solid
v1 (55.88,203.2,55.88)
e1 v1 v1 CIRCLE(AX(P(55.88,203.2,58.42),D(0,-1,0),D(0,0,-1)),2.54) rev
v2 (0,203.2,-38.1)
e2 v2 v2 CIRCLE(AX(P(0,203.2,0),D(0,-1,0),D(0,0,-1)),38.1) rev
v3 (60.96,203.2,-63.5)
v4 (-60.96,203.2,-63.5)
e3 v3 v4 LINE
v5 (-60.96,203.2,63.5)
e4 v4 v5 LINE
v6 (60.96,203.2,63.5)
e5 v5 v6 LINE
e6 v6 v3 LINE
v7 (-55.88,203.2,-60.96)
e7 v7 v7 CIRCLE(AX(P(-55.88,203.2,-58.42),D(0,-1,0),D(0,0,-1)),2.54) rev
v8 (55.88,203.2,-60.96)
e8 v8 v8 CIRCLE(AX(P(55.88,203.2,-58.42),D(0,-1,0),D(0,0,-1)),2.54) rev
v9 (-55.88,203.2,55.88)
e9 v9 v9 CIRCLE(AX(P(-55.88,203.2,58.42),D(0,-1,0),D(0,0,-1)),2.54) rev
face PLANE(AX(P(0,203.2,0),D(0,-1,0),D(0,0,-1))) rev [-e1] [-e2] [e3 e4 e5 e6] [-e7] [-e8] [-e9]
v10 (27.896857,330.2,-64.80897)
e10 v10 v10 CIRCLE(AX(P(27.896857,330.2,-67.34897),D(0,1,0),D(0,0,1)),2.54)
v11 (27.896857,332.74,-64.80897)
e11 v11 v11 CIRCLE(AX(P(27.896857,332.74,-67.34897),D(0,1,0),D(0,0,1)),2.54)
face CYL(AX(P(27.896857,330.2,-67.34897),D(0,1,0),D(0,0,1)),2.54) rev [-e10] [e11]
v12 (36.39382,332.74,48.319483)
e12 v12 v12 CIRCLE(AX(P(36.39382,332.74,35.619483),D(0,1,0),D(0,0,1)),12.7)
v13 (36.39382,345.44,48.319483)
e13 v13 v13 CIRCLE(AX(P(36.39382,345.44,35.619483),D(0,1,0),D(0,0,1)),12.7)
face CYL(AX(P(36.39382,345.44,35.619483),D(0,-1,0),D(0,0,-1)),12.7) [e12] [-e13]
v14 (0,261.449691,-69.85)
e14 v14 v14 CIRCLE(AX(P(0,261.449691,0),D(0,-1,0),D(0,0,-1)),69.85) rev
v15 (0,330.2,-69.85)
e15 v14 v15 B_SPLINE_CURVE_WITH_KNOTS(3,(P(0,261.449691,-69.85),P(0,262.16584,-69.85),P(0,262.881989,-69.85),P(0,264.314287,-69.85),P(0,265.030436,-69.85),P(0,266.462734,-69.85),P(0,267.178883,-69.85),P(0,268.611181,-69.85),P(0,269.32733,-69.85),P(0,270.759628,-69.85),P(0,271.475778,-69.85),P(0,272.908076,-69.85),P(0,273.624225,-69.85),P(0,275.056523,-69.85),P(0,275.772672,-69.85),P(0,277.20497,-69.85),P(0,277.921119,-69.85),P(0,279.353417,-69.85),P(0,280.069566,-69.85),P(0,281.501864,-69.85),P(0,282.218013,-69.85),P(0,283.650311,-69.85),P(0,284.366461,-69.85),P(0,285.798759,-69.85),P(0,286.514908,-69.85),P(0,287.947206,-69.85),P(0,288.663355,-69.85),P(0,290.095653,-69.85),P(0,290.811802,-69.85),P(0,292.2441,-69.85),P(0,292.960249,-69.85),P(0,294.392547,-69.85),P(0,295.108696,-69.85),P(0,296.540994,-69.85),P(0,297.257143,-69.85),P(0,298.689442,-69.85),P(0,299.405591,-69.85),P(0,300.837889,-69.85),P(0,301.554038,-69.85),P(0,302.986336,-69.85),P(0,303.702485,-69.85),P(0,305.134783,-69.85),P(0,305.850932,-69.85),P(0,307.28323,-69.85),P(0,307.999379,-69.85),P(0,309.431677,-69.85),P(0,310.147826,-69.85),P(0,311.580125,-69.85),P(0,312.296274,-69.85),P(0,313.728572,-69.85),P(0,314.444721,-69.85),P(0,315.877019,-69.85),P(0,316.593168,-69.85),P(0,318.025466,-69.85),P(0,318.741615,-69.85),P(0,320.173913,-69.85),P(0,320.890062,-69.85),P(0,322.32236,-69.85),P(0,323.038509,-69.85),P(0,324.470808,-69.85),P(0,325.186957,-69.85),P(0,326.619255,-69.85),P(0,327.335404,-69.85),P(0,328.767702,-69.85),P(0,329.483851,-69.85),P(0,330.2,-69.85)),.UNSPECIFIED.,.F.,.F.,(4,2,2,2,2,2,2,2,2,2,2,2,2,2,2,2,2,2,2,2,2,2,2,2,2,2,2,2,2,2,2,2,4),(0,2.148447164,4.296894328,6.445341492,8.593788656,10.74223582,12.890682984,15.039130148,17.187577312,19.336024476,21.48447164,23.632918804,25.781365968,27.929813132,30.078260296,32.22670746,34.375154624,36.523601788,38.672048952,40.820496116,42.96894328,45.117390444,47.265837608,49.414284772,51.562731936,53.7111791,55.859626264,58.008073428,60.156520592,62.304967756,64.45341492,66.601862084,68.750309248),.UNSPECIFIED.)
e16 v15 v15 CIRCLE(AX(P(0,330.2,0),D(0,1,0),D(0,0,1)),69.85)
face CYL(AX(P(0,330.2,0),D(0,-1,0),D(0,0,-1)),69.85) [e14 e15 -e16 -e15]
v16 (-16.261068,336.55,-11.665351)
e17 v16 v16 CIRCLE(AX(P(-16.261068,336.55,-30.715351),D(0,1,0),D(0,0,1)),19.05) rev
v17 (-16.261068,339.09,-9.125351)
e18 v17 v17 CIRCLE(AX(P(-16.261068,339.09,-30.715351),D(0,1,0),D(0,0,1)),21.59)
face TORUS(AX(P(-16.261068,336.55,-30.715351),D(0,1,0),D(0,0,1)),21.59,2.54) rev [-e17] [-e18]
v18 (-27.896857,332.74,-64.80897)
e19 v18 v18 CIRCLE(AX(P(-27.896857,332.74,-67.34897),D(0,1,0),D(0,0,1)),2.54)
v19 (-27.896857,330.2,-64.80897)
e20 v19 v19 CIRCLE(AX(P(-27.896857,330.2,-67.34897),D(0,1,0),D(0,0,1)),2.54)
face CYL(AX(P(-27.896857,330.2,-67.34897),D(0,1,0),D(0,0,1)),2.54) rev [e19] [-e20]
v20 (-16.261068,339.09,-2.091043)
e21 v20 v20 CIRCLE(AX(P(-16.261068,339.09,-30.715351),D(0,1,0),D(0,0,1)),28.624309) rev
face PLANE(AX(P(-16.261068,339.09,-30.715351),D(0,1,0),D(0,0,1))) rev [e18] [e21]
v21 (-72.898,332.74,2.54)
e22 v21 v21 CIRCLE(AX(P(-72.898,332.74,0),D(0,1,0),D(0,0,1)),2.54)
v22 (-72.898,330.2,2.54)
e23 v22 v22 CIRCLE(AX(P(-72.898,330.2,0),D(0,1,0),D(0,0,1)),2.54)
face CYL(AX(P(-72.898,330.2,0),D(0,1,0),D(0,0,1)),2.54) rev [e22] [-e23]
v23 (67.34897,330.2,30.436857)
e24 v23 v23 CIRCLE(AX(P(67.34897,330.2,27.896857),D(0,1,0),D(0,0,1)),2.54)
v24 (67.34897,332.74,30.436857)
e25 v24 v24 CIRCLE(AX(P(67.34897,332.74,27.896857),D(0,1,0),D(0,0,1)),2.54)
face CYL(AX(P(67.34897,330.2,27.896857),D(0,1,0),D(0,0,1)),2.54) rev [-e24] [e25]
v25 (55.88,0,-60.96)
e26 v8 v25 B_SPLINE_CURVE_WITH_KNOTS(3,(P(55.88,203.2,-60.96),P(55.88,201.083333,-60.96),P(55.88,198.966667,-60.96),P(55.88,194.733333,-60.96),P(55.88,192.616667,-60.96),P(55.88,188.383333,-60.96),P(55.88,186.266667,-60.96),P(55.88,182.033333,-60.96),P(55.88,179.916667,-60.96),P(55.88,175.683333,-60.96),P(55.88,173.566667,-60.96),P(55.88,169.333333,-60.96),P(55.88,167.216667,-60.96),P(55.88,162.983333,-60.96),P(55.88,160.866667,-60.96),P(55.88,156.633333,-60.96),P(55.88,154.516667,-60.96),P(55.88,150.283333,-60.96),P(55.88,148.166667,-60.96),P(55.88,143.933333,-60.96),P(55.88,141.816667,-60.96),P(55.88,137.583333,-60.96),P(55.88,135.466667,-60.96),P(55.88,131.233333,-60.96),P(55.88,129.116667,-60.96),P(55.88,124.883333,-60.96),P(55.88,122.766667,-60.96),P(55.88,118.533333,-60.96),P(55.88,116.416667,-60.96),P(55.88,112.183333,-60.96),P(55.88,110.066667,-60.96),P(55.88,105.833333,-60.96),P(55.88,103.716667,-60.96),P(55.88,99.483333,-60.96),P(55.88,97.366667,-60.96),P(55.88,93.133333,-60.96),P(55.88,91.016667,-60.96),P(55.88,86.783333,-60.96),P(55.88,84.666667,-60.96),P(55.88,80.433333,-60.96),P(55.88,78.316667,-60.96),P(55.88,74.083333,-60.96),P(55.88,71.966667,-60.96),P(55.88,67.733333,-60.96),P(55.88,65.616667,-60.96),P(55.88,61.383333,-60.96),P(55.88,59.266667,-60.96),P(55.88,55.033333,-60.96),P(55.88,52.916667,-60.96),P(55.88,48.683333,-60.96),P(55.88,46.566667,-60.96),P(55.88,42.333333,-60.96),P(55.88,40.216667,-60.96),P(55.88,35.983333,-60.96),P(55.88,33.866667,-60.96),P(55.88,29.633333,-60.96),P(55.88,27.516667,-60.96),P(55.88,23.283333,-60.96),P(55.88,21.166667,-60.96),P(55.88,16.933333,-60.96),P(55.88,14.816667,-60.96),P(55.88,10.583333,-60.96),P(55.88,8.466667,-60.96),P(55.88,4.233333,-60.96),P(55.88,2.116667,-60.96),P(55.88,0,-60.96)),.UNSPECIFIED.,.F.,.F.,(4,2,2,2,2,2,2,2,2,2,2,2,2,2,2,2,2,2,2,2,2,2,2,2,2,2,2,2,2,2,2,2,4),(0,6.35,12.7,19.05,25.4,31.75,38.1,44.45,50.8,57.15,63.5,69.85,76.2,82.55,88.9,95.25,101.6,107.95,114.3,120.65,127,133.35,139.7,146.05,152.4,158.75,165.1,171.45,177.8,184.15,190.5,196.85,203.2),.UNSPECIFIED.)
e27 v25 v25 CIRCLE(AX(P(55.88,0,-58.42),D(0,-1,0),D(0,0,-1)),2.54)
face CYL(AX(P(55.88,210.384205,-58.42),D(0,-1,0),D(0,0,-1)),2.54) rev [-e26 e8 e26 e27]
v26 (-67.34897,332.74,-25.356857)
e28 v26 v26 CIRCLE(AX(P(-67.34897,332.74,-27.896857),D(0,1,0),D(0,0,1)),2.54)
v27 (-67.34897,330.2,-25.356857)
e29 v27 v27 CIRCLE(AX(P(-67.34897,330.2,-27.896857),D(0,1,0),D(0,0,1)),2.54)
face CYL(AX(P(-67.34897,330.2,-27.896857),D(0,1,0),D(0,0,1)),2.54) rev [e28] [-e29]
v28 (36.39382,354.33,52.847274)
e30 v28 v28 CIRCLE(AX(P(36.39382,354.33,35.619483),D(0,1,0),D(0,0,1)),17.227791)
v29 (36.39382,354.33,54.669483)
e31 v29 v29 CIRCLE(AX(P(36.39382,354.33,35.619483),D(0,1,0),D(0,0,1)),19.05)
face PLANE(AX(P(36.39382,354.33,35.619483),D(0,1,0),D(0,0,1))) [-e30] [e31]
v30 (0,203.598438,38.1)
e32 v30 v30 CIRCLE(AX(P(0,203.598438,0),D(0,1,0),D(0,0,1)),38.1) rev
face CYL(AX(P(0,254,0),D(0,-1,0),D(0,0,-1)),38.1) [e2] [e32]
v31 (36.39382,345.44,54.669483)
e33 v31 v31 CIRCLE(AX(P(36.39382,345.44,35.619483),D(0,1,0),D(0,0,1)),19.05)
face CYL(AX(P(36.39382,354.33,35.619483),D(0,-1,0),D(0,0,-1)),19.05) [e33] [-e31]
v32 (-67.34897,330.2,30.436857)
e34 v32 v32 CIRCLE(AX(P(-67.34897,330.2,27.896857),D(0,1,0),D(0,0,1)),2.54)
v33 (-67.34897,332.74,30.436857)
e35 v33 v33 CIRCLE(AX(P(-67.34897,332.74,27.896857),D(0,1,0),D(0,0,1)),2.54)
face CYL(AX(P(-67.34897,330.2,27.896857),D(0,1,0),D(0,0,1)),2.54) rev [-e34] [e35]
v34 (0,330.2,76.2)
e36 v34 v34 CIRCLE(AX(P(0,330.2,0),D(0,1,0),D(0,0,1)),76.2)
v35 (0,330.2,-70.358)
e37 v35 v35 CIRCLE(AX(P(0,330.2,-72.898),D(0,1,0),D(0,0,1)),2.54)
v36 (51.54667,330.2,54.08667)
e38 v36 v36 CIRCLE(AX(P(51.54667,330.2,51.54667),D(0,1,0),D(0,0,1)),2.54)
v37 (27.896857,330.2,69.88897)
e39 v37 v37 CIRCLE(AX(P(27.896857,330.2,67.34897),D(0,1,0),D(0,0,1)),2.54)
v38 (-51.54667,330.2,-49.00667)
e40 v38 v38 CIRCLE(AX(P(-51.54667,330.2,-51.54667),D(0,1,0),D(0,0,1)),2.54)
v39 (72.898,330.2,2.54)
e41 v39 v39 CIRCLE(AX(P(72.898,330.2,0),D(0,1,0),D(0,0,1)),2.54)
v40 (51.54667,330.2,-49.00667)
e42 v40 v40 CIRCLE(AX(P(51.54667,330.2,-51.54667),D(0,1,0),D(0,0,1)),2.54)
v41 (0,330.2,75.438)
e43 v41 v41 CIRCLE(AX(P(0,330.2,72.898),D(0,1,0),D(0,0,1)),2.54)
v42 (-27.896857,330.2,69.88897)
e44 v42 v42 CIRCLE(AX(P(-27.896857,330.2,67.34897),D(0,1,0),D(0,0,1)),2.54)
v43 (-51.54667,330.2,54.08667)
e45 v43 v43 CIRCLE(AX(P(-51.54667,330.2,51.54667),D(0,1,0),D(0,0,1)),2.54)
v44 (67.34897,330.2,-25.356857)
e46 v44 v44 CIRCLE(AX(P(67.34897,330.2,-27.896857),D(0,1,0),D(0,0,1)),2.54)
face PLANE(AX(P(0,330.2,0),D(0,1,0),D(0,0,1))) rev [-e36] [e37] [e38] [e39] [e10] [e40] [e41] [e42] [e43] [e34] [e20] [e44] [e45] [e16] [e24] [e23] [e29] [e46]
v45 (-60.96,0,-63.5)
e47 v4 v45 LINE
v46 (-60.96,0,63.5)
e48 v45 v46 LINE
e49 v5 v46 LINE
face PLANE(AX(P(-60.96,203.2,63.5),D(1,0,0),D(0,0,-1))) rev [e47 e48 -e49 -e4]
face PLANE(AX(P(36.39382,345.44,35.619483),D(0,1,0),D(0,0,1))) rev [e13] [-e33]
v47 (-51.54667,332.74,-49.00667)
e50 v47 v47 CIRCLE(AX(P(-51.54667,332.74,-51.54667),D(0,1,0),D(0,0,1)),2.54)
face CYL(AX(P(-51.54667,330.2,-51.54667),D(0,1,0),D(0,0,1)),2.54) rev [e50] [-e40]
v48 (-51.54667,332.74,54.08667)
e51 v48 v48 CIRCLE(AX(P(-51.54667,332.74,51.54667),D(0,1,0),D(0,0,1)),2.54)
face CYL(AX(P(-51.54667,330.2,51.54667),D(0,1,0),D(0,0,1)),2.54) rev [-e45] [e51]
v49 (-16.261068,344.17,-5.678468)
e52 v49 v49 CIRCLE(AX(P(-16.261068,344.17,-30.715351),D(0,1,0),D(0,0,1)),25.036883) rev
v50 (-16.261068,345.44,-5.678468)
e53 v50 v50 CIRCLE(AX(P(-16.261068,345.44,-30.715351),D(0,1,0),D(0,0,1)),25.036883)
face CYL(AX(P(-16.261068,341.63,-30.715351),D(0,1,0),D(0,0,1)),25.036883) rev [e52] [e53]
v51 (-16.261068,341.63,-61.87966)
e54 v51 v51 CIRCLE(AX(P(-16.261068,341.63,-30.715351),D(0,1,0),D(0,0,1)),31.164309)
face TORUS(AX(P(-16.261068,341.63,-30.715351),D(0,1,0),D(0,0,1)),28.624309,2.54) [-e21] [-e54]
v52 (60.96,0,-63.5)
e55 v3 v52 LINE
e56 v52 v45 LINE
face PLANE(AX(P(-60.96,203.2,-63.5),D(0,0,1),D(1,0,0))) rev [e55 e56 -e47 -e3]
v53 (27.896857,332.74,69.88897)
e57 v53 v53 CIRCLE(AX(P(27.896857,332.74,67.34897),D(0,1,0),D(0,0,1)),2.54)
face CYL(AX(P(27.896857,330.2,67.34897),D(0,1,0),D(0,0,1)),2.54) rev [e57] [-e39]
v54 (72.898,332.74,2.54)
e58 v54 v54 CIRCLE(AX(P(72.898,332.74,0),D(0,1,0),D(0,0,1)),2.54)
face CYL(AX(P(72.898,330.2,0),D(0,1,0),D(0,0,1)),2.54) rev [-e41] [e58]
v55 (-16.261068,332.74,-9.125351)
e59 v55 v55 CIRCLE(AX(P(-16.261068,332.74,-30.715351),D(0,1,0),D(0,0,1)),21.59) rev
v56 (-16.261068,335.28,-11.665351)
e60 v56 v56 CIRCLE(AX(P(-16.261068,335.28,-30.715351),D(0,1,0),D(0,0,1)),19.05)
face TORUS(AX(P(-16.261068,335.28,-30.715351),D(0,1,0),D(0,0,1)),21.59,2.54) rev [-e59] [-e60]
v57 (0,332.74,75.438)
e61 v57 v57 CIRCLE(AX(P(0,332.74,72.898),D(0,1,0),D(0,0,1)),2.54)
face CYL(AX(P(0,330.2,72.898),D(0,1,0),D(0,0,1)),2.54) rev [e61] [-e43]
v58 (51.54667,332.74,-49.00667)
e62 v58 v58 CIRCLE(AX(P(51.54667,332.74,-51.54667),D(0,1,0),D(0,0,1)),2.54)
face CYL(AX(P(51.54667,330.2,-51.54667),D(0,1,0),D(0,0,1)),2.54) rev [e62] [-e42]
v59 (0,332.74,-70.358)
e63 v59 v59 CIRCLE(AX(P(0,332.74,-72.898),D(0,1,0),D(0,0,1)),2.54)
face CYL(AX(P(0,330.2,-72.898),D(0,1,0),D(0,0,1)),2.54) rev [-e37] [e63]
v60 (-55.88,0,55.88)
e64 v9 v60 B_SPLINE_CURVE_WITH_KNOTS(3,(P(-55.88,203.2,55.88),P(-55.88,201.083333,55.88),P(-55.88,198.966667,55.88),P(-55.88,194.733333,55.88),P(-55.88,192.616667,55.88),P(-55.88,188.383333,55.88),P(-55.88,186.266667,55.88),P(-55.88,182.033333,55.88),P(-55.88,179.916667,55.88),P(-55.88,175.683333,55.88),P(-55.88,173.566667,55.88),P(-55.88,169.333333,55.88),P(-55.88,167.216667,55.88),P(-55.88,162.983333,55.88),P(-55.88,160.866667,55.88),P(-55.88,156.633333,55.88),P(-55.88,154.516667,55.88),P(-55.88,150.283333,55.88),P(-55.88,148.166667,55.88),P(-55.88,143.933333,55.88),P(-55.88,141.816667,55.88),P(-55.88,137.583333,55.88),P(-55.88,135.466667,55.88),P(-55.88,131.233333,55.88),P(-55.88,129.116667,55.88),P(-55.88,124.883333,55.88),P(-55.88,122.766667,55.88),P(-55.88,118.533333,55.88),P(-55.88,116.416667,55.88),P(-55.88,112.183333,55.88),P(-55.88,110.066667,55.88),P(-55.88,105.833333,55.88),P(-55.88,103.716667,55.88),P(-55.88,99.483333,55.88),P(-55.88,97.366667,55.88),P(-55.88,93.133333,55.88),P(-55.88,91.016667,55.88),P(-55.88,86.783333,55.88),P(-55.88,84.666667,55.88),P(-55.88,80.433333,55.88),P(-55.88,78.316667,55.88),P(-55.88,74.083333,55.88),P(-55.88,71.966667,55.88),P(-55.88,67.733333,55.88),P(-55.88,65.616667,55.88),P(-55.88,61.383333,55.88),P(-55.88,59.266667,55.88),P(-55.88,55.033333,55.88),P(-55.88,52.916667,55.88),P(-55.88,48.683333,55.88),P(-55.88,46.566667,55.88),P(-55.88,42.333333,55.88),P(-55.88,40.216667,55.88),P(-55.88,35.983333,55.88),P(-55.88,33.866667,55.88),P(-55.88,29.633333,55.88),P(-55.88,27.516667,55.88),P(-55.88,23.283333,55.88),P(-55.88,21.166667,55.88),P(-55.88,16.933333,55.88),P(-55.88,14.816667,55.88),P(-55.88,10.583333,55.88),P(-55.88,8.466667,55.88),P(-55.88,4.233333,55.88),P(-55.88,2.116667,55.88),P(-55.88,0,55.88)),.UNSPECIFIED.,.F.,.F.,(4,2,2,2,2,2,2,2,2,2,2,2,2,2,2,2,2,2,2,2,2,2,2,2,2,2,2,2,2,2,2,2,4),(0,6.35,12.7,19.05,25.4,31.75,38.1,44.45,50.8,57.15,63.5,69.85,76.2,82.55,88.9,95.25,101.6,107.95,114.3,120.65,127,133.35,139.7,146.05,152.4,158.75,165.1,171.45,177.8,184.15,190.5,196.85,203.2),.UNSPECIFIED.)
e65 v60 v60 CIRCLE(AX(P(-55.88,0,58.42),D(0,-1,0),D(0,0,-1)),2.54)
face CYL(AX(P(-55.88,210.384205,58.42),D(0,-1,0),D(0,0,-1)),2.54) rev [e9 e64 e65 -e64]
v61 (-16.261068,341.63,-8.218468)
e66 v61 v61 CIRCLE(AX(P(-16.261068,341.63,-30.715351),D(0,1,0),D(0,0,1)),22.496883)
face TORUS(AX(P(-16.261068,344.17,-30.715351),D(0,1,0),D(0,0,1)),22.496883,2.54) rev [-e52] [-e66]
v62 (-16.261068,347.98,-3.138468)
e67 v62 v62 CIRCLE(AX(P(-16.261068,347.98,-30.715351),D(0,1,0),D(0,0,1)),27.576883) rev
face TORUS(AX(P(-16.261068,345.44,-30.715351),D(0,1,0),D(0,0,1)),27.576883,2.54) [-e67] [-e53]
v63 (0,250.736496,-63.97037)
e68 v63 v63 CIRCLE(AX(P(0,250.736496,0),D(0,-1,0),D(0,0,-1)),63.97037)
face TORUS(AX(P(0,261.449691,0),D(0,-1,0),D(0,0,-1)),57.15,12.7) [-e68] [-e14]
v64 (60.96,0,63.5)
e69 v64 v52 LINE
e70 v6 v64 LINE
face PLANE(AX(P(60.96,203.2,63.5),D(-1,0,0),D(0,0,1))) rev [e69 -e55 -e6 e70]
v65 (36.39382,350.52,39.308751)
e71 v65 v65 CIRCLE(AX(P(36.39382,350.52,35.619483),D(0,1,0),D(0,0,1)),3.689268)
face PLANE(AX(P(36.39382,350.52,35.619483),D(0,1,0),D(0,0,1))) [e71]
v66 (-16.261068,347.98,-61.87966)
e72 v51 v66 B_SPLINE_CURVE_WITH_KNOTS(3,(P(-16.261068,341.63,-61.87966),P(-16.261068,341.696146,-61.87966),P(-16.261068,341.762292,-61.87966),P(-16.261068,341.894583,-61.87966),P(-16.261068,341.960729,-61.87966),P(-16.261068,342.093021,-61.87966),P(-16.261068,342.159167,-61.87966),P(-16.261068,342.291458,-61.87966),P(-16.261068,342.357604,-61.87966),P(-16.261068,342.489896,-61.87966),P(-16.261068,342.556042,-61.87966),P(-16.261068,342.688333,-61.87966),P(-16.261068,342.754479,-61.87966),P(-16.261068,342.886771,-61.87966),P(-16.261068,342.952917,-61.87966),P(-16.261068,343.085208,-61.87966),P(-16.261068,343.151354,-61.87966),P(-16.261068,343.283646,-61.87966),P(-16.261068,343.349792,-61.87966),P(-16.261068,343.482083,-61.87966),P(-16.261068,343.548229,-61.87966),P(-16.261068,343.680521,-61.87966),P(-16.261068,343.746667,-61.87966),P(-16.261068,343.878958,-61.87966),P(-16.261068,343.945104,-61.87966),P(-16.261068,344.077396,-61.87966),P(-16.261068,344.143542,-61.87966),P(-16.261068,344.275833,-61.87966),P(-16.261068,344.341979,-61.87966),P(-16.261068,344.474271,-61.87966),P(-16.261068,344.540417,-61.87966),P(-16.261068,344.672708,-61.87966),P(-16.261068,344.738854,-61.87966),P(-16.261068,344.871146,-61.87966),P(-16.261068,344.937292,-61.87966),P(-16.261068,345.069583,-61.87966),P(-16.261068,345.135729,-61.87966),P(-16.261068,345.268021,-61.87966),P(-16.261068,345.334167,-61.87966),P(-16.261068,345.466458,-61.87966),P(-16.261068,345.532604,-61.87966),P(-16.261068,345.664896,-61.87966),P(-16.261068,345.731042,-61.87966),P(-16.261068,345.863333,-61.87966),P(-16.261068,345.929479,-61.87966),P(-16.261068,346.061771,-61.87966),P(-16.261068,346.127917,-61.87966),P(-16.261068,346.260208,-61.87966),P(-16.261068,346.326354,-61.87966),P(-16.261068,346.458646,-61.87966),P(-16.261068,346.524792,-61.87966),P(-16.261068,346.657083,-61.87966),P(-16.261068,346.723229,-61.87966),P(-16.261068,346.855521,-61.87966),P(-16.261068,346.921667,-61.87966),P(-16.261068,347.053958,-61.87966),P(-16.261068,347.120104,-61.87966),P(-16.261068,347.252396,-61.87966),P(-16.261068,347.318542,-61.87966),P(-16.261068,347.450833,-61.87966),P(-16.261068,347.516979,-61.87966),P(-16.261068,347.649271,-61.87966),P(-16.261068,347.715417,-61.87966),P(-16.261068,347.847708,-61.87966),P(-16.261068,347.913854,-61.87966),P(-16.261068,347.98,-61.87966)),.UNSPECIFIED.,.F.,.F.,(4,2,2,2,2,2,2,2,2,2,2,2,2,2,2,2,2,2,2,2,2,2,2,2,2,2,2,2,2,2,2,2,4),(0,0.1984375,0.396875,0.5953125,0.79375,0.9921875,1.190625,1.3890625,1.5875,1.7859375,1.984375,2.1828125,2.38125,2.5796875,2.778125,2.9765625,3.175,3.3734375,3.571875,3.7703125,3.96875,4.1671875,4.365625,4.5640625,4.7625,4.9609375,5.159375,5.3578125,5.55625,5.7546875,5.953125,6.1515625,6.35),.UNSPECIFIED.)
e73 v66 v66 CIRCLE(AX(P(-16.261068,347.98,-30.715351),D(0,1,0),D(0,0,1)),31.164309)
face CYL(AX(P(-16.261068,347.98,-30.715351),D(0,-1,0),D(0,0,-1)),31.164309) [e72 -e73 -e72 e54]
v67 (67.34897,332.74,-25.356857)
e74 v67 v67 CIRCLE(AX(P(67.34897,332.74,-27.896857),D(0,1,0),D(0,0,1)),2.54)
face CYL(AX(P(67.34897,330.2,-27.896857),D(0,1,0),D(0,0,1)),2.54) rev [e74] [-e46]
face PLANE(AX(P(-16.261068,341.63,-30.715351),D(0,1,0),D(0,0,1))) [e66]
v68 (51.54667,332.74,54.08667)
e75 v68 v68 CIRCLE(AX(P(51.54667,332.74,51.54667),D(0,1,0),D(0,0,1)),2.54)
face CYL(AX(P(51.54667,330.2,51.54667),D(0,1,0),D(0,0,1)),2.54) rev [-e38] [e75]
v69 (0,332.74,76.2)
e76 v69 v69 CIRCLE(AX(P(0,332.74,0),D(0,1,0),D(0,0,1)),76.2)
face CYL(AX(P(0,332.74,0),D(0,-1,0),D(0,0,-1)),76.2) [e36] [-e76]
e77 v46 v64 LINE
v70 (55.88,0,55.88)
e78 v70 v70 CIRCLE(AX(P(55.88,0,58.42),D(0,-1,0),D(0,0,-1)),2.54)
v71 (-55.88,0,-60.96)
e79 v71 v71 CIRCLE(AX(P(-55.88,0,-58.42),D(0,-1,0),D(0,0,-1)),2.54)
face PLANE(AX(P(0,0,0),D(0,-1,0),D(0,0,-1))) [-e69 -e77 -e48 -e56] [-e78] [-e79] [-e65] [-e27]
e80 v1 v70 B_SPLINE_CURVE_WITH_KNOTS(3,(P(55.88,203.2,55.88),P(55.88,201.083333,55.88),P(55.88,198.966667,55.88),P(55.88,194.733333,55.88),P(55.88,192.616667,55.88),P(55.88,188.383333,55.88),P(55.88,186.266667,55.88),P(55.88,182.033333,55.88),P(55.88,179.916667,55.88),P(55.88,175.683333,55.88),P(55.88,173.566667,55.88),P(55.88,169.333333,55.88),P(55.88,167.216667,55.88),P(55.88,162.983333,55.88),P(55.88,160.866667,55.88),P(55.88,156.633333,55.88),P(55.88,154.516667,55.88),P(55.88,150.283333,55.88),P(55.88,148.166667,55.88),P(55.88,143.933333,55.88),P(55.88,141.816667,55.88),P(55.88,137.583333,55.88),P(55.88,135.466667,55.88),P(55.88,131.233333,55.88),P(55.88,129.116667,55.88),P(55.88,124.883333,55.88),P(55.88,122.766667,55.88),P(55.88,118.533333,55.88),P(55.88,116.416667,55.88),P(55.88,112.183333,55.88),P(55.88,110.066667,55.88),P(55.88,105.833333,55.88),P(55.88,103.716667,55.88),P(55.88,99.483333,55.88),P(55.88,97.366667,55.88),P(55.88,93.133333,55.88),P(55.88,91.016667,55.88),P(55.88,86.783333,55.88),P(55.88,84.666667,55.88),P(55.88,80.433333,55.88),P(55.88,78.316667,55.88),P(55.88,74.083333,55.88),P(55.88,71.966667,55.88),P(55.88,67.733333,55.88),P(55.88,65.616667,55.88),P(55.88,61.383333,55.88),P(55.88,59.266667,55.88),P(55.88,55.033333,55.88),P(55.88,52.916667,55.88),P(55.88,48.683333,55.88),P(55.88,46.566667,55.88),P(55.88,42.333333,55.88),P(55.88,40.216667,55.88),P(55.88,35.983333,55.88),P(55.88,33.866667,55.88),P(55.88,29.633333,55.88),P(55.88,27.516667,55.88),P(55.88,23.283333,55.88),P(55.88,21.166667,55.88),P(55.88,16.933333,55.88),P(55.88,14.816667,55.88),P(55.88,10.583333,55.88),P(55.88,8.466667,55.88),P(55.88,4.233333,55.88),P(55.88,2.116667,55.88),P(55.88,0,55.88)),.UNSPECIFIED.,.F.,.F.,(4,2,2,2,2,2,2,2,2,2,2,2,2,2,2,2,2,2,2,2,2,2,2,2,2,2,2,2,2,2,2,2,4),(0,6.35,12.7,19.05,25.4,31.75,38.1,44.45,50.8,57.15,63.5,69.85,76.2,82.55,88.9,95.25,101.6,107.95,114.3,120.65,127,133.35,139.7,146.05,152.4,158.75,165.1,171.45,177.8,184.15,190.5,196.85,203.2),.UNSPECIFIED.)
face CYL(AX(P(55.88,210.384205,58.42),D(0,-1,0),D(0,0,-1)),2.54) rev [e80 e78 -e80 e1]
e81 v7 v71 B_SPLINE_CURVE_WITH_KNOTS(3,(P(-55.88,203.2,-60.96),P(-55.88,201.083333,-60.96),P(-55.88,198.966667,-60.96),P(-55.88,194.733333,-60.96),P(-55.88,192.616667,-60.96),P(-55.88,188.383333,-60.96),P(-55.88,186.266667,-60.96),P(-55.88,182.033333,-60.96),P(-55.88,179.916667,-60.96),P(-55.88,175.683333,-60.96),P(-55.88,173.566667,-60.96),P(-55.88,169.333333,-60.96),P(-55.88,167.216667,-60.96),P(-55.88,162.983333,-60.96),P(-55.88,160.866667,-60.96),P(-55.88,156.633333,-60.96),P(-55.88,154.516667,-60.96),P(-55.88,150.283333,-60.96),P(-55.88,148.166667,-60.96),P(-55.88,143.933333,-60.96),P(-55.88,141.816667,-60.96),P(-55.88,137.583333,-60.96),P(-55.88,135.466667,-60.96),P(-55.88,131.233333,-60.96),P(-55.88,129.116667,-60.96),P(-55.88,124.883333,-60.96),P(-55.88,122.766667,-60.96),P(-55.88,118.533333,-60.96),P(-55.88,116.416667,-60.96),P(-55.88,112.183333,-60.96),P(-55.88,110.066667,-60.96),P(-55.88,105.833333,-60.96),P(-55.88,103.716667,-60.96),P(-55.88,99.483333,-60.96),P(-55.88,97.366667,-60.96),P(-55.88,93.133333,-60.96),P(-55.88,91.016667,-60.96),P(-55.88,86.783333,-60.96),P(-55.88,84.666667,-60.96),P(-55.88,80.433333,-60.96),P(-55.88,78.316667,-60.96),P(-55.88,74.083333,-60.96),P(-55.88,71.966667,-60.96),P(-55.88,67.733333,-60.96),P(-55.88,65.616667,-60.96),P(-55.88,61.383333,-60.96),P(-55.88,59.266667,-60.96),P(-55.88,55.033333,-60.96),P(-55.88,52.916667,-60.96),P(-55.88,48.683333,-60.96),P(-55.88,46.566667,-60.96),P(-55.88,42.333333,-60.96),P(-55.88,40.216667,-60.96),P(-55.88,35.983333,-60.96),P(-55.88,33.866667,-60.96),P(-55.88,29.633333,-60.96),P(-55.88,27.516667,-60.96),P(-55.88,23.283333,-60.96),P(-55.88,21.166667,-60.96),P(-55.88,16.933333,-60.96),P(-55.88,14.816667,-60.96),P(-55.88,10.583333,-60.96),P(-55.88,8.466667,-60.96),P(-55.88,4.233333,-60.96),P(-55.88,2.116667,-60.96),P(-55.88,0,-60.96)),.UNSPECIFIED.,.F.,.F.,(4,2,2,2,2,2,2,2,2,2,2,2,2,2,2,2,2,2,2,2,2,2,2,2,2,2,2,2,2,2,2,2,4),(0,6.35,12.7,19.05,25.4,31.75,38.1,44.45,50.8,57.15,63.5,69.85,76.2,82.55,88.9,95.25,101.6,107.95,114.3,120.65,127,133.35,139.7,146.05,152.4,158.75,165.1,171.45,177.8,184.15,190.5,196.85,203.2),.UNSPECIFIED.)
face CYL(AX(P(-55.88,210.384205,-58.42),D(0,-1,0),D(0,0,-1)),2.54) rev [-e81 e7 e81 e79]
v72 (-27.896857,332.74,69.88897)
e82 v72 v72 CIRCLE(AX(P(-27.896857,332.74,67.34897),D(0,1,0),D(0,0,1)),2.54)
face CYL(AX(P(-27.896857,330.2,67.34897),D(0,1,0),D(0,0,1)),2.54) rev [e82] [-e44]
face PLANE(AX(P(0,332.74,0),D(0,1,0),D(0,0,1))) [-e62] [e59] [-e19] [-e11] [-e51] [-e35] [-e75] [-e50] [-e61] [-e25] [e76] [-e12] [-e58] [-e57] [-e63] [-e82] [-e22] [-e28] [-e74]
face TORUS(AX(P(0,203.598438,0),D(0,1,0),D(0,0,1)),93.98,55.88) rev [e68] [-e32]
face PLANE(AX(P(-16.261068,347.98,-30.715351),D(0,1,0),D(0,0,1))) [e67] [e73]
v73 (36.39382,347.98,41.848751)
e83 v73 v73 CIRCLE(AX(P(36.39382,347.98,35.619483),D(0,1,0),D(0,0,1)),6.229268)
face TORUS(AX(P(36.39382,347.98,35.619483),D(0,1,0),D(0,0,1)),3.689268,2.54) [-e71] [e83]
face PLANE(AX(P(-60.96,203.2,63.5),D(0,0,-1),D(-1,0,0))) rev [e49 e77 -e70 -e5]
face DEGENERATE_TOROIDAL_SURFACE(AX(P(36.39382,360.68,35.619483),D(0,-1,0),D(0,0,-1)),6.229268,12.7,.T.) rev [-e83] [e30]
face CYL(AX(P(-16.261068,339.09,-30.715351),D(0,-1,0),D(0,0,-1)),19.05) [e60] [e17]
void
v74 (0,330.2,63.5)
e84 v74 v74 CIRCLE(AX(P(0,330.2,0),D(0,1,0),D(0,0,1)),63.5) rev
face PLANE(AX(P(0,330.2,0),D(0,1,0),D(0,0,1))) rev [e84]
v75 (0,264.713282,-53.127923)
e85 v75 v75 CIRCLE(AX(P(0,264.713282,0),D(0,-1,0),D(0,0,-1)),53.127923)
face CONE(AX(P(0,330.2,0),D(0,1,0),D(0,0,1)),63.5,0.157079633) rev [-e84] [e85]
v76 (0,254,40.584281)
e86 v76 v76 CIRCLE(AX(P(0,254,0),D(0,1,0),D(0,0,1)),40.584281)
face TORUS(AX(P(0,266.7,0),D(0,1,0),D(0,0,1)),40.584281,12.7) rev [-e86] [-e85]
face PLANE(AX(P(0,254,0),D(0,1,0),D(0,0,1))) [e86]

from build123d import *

# Parameters (mm, degrees)
SKETCH1_W           = 121.92
SKETCH1_H           = 127
BOSS_EXTRUDE1_DEPTH = 203.2
SKETCH2_R           = 38.1
BOSS_EXTRUDE2_DEPTH = 50.8
SKETCH3_R           = 69.85
BOSS_EXTRUDE3_DEPTH = 76.2
FILLET1_R           = 55.88
FILLET2_R           = 12.7
SKETCH4_R           = 63.5
CUT_EXTRUDE1_DEPTH  = 76.2
CUT_EXTRUDE1_DRAFT  = -9
FILLET3_R           = 12.7
SKETCH5_R           = 76.2
BOSS_EXTRUDE4_DEPTH = 2.54
SKETCH6_R           = 2.54
CUT_EXTRUDE2_DEPTH  = 2.54
SKETCH8_R           = 12.7
BOSS_EXTRUDE5_DEPTH = 12.7
SKETCH9_R           = 19.05
BOSS_EXTRUDE6_DEPTH = 8.89
SKETCH10_R          = 17.227790741
CUT_EXTRUDE9_DEPTH  = 6.35
FILLET4_R           = 12.7
SKETCH11_R          = 6.229268113
BOSS_EXTRUDE7_DEPTH = 2.54
FILLET5_R           = 2.54
SKETCH12_R          = 19.05
BOSS_EXTRUDE8_DEPTH = 6.35
SKETCH13_R          = 31.164308849
BOSS_EXTRUDE9_DEPTH = 8.89
SKETCH14_R          = 25.036883069
CUT_EXTRUDE11_DEPTH = 6.35
FILLET6_R           = 2.54
FILLET7_R           = 2.54
FILLET8_R           = 2.54
FILLET9_R           = 2.54
FILLET10_R          = 2.54
CUT_EXTRUDE12_DEPTH = 203.2


# Some blends are built 0.0001 mm under size
with BuildPart() as part:
    # Sketch1 → Boss-Extrude1 (new body)
    with BuildSketch(Plane(origin=(0, 0, 0), x_dir=(1, 0, 0), z_dir=(0, 1, 0))):
        Rectangle(SKETCH1_W, SKETCH1_H)
    extrude(amount=BOSS_EXTRUDE1_DEPTH)

    # Sketch2 → Boss-Extrude2 (add)
    with BuildSketch(Plane(origin=(0, 203.2, 0), x_dir=(1, 0, 0), z_dir=(0, 1, 0))):
        with Locations(Location((0, 0, 0), (0, 0, 90))):
            Circle(SKETCH2_R)
    extrude(amount=BOSS_EXTRUDE2_DEPTH)

    # Sketch3 → Boss-Extrude3 (add)
    with BuildSketch(Plane(origin=(0, 254, 0), x_dir=(1, 0, 0), z_dir=(0, 1, 0))):
        with Locations(Location((0, 0, 0), (0, 0, 90))):
            Circle(SKETCH3_R)
    extrude(amount=BOSS_EXTRUDE3_DEPTH)

    # Fillet1
    # the kernel refuses this fillet: 55.88 mm, written as the material it adds along each edge
    with BuildSketch(Plane(origin=(0, 254, 0), x_dir=(0, 0, -1), z_dir=(1, 0, 0))) as fillet1_piece_1:
        with BuildLine():
            CenterArc((93.98, -50.401562476), FILLET1_R, 115.583001977, 64.416998023)
            Line((38.1, -50.401562476), (36.9824, -50.401562476))
            Line((36.9824, -50.401562476), (36.9824, 0))
            Line((36.9824, 0), (38.1, 1.1176))
            ThreePointArc((38.1, 1.1176), (53.975, 1.1176), (69.3674, 1.00803125))
            Line((69.3674, 1.00803125), (69.85, 0))
        make_face()
    revolve(axis=Axis((0, 254, 0), (0, 1, 0)))

    # Fillet2
    fillet2_edges = [part.edges().sort_by_distance(p)[0] for p in [
        (0, 254, 69.85),
    ]]
    fillet(fillet2_edges, radius=FILLET2_R)


with BuildPart() as cut_extrude1_tool:
    # Sketch4 → Cut-Extrude1 (with draft: the straight prism first)
    with BuildSketch(Plane(origin=(0, 330.2, 0), x_dir=(1, 0, 0), z_dir=(0, 1, 0))):
        Circle(SKETCH4_R)
    extrude(amount=-CUT_EXTRUDE1_DEPTH)
    # Cut-Extrude1: the draft: its side faces are tilted about the plane it starts from
    cut_extrude1_sides = [cut_extrude1_tool.faces().sort_by_distance(p)[0] for p in [
        (-63.5, 292.1, 0),
    ]]
    draft(cut_extrude1_sides, Plane(origin=(0, 330.2, 0), x_dir=(1, 0, 0), z_dir=(0, 1, 0)), CUT_EXTRUDE1_DRAFT)


with BuildPart() as part_1:
    add(part.part)

    # Cut-Extrude1: cut by cut_extrude1_tool
    add(cut_extrude1_tool.part, mode=Mode.SUBTRACT)

    # Fillet3
    fillet3_edges = [part_1.edges().sort_by_distance(p)[0] for p in [
        (-51.431105647, 254, 0),
    ]]
    fillet(fillet3_edges, radius=FILLET3_R)

    # Sketch5 → Boss-Extrude4 (add)
    with BuildSketch(Plane(origin=(0, 330.2, 0), x_dir=(1, 0, 0), z_dir=(0, 1, 0))):
        with Locations(Location((0, 0, 0), (0, 0, 270))):
            Circle(SKETCH5_R)
    extrude(amount=BOSS_EXTRUDE4_DEPTH)

    # Sketch6 → Cut-Extrude2 (cut)
    with BuildSketch(Plane(origin=(0, 332.74, 0), x_dir=(1, 0, 0), z_dir=(0, 1, 0))):
        with Locations(Location((0, 72.898, 0), (0, 0, 270))):
            Circle(SKETCH6_R)
        with Locations(Location((27.896856853, 67.348970161, 0), (0, 0, 270))):
            Circle(SKETCH6_R)
        with Locations(Location((51.546670135, 51.546670135, 0), (0, 0, 270))):
            Circle(SKETCH6_R)
        with Locations(Location((67.348970161, 27.896856853, 0), (0, 0, 270))):
            Circle(SKETCH6_R)
        with Locations(Location((72.898, 0, 0), (0, 0, 270))):
            Circle(SKETCH6_R)
        with Locations(Location((67.348970161, -27.896856853, 0), (0, 0, 270))):
            Circle(SKETCH6_R)
        with Locations(Location((51.546670135, -51.546670135, 0), (0, 0, 270))):
            Circle(SKETCH6_R)
        with Locations(Location((27.896856853, -67.348970161, 0), (0, 0, 270))):
            Circle(SKETCH6_R)
        with Locations(Location((0, -72.898, 0), (0, 0, 270))):
            Circle(SKETCH6_R)
        with Locations(Location((-27.896856853, -67.348970161, 0), (0, 0, 270))):
            Circle(SKETCH6_R)
        with Locations(Location((-51.546670135, -51.546670135, 0), (0, 0, 270))):
            Circle(SKETCH6_R)
        with Locations(Location((-67.348970161, -27.896856853, 0), (0, 0, 270))):
            Circle(SKETCH6_R)
        with Locations(Location((-72.898, 0, 0), (0, 0, 270))):
            Circle(SKETCH6_R)
        with Locations(Location((-67.348970161, 27.896856853, 0), (0, 0, 270))):
            Circle(SKETCH6_R)
        with Locations(Location((-51.546670135, 51.546670135, 0), (0, 0, 270))):
            Circle(SKETCH6_R)
        with Locations(Location((-27.896856853, 67.348970161, 0), (0, 0, 270))):
            Circle(SKETCH6_R)
    extrude(amount=-CUT_EXTRUDE2_DEPTH, mode=Mode.SUBTRACT)

    # Sketch8 → Boss-Extrude5 (add)
    with BuildSketch(Plane(origin=(0, 332.74, 0), x_dir=(1, 0, 0), z_dir=(0, 1, 0))):
        with Locations(Location((36.393819719, -35.619483129, 0), (0, 0, 270))):
            Circle(SKETCH8_R)
    extrude(amount=BOSS_EXTRUDE5_DEPTH)

    # Sketch9 → Boss-Extrude6 (add)
    with BuildSketch(Plane(origin=(0, 345.44, 0), x_dir=(1, 0, 0), z_dir=(0, 1, 0))):
        with Locations(Location((36.393819719, -35.619483129, 0), (0, 0, 270))):
            Circle(SKETCH9_R)
    extrude(amount=BOSS_EXTRUDE6_DEPTH)

    # Sketch10 → Cut-Extrude9 (cut)
    with BuildSketch(Plane(origin=(0, 354.33, 0), x_dir=(1, 0, 0), z_dir=(0, 1, 0))):
        with Locations(Location((36.393819719, -35.619483129, 0), (0, 0, 270))):
            Circle(SKETCH10_R)
    extrude(amount=-CUT_EXTRUDE9_DEPTH, mode=Mode.SUBTRACT)

    # Fillet4
    # the kernel refuses this fillet: 12.7 mm, written as the material it adds along each edge
    with BuildSketch(Plane(origin=(36.393819719, 347.98, 35.619483129), x_dir=(0, 0, 1), z_dir=(-1, 0, 0))) as fillet4_piece_1:
        with BuildLine():
            CenterArc((6.229268113, 12.7), FILLET4_R, 270, 60)
            Line((6.229268113, 0), (6.229268113, -0.254))
            Line((6.229268113, -0.254), (17.227790741, -0.254))
            Line((17.227790741, -0.254), (17.481790741, 0))
            ThreePointArc((17.481790741, 0), (17.481790741, 3.175), (17.447761194, 6.223))
            Line((17.447761194, 6.223), (17.227790741, 6.35))
        make_face()
    revolve(axis=Axis((36.393819719, 347.98, 35.619483129), (0, 1, 0)))

    # Sketch11 → Boss-Extrude7 (add)
    with BuildSketch(Plane(origin=(0, 347.98, 0), x_dir=(1, 0, 0), z_dir=(0, 1, 0))):
        with Locations(Location((36.393819719, -35.619483129, 0), (0, 0, 270))):
            Circle(SKETCH11_R)
    extrude(amount=BOSS_EXTRUDE7_DEPTH)

    # Fillet5
    fillet5_edges = [part_1.edges().sort_by_distance(p)[0] for p in [
        (36.393819719, 350.52, 29.390215016),
    ]]
    fillet(fillet5_edges, radius=FILLET5_R - 0.0001)  # a hair under: the kernel refuses the full size

    # Sketch12 → Boss-Extrude8 (add)
    with BuildSketch(Plane(origin=(0, 332.74, 0), x_dir=(1, 0, 0), z_dir=(0, 1, 0))):
        with Locations(Location((-16.261068385, 30.715351394, 0), (0, 0, 270))):
            Circle(SKETCH12_R)
    extrude(amount=BOSS_EXTRUDE8_DEPTH)

    # Sketch13 → Boss-Extrude9 (add)
    with BuildSketch(Plane(origin=(0, 339.09, 0), x_dir=(1, 0, 0), z_dir=(0, 1, 0))):
        with Locations(Location((-16.261068385, 30.715351394, 0), (0, 0, 90))):
            Circle(SKETCH13_R)
    extrude(amount=BOSS_EXTRUDE9_DEPTH)

    # Sketch14 → Cut-Extrude11 (cut)
    with BuildSketch(Plane(origin=(0, 347.98, 0), x_dir=(1, 0, 0), z_dir=(0, 1, 0))):
        with Locations(Location((-16.261068385, 30.715351394, 0), (0, 0, 270))):
            Circle(SKETCH14_R)
    extrude(amount=-CUT_EXTRUDE11_DEPTH, mode=Mode.SUBTRACT)

    # Fillet6
    fillet6_edges = [part_1.edges().sort_by_distance(p)[0] for p in [
        (-16.261068385, 341.63, -55.752234463),
    ]]
    fillet(fillet6_edges, radius=FILLET6_R)

    # Fillet7
    fillet7_edges = [part_1.edges().sort_by_distance(p)[0] for p in [
        (-16.261068385, 347.98, -55.752234463),
    ]]
    fillet(fillet7_edges, radius=FILLET7_R)

    # Fillet8
    fillet8_edges = [part_1.edges().sort_by_distance(p)[0] for p in [
        (-16.261068385, 332.74, -49.765351394),
    ]]
    fillet(fillet8_edges, radius=FILLET8_R)

    # Fillet9
    fillet9_edges = [part_1.edges().sort_by_distance(p)[0] for p in [
        (-16.261068385, 339.09, -49.765351394),
    ]]
    fillet(fillet9_edges, radius=FILLET9_R)

    # Fillet10
    fillet10_edges = [part_1.edges().sort_by_distance(p)[0] for p in [
        (-16.261068385, 339.09, 0.448957456),
    ]]
    fillet(fillet10_edges, radius=FILLET10_R)

    # Sketch15 → Cut-Extrude12 (cut)
    with BuildSketch(Plane.XZ):
        with BuildLine():
            ThreePointArc((53.34, 58.42), (54.083948776, 56.623948776), (55.88, 55.88))
            Line((55.88, 55.88), (55.88, 58.42))
            Line((55.88, 58.42), (53.34, 58.42))
        make_face()
        with BuildLine():
            Line((55.88, 58.42), (55.88, 55.88))
            ThreePointArc((55.88, 55.88), (57.676051224, 56.623948776), (58.42, 58.42))
            ThreePointArc((58.42, 58.42), (55.88, 60.96), (53.34, 58.42))
            Line((53.34, 58.42), (55.88, 58.42))
        make_face()
        with BuildLine():
            ThreePointArc((53.34, 58.42), (54.083948776, 56.623948776), (55.88, 55.88))
            Line((55.88, 55.88), (55.88, 58.42))
            Line((55.88, 58.42), (53.34, 58.42))
        make_face()
        with BuildLine():
            Line((55.88, 58.42), (55.88, 55.88))
            ThreePointArc((55.88, 55.88), (57.676051224, 56.623948776), (58.42, 58.42))
            ThreePointArc((58.42, 58.42), (55.88, 60.96), (53.34, 58.42))
            Line((53.34, 58.42), (55.88, 58.42))
        make_face()
        with BuildLine():
            ThreePointArc((-55.88, 55.88), (-54.083948776, 56.623948776), (-53.34, 58.42))
            Line((-53.34, 58.42), (-55.88, 58.42))
            Line((-55.88, 58.42), (-55.88, 55.88))
        make_face()
        with BuildLine():
            Line((-55.88, 58.42), (-53.34, 58.42))
            ThreePointArc((-53.34, 58.42), (-57.676051224, 60.216051224), (-55.88, 55.88))
            Line((-55.88, 55.88), (-55.88, 58.42))
        make_face()
        with BuildLine():
            ThreePointArc((-55.88, 55.88), (-54.083948776, 56.623948776), (-53.34, 58.42))
            Line((-53.34, 58.42), (-55.88, 58.42))
            Line((-55.88, 58.42), (-55.88, 55.88))
        make_face()
        with BuildLine():
            Line((-55.88, 58.42), (-53.34, 58.42))
            ThreePointArc((-53.34, 58.42), (-57.676051224, 60.216051224), (-55.88, 55.88))
            Line((-55.88, 55.88), (-55.88, 58.42))
        make_face()
        with BuildLine():
            ThreePointArc((-55.88, -55.88), (-57.676051224, -60.216051224), (-53.34, -58.42))
            Line((-53.34, -58.42), (-55.88, -58.42))
            Line((-55.88, -58.42), (-55.88, -55.88))
        make_face()
        with BuildLine():
            Line((-55.88, -58.42), (-53.34, -58.42))
            ThreePointArc((-53.34, -58.42), (-54.083948776, -56.623948776), (-55.88, -55.88))
            Line((-55.88, -55.88), (-55.88, -58.42))
        make_face()
        with BuildLine():
            ThreePointArc((-55.88, -55.88), (-57.676051224, -60.216051224), (-53.34, -58.42))
            Line((-53.34, -58.42), (-55.88, -58.42))
            Line((-55.88, -58.42), (-55.88, -55.88))
        make_face()
        with BuildLine():
            Line((-55.88, -58.42), (-53.34, -58.42))
            ThreePointArc((-53.34, -58.42), (-54.083948776, -56.623948776), (-55.88, -55.88))
            Line((-55.88, -55.88), (-55.88, -58.42))
        make_face()
        with BuildLine():
            Line((53.34, -58.42), (55.88, -58.42))
            Line((55.88, -58.42), (55.88, -55.88))
            ThreePointArc((55.88, -55.88), (54.083948776, -56.623948776), (53.34, -58.42))
        make_face()
        with BuildLine():
            Line((55.88, -55.88), (55.88, -58.42))
            Line((55.88, -58.42), (53.34, -58.42))
            ThreePointArc((53.34, -58.42), (55.88, -60.96), (58.42, -58.42))
            ThreePointArc((58.42, -58.42), (57.676051224, -56.623948776), (55.88, -55.88))
        make_face()
        with BuildLine():
            Line((53.34, -58.42), (55.88, -58.42))
            Line((55.88, -58.42), (55.88, -55.88))
            ThreePointArc((55.88, -55.88), (54.083948776, -56.623948776), (53.34, -58.42))
        make_face()
        with BuildLine():
            Line((55.88, -55.88), (55.88, -58.42))
            Line((55.88, -58.42), (53.34, -58.42))
            ThreePointArc((53.34, -58.42), (55.88, -60.96), (58.42, -58.42))
            ThreePointArc((58.42, -58.42), (57.676051224, -56.623948776), (55.88, -55.88))
        make_face()
    extrude(amount=-CUT_EXTRUDE12_DEPTH, mode=Mode.SUBTRACT)


solid = part_1.part
